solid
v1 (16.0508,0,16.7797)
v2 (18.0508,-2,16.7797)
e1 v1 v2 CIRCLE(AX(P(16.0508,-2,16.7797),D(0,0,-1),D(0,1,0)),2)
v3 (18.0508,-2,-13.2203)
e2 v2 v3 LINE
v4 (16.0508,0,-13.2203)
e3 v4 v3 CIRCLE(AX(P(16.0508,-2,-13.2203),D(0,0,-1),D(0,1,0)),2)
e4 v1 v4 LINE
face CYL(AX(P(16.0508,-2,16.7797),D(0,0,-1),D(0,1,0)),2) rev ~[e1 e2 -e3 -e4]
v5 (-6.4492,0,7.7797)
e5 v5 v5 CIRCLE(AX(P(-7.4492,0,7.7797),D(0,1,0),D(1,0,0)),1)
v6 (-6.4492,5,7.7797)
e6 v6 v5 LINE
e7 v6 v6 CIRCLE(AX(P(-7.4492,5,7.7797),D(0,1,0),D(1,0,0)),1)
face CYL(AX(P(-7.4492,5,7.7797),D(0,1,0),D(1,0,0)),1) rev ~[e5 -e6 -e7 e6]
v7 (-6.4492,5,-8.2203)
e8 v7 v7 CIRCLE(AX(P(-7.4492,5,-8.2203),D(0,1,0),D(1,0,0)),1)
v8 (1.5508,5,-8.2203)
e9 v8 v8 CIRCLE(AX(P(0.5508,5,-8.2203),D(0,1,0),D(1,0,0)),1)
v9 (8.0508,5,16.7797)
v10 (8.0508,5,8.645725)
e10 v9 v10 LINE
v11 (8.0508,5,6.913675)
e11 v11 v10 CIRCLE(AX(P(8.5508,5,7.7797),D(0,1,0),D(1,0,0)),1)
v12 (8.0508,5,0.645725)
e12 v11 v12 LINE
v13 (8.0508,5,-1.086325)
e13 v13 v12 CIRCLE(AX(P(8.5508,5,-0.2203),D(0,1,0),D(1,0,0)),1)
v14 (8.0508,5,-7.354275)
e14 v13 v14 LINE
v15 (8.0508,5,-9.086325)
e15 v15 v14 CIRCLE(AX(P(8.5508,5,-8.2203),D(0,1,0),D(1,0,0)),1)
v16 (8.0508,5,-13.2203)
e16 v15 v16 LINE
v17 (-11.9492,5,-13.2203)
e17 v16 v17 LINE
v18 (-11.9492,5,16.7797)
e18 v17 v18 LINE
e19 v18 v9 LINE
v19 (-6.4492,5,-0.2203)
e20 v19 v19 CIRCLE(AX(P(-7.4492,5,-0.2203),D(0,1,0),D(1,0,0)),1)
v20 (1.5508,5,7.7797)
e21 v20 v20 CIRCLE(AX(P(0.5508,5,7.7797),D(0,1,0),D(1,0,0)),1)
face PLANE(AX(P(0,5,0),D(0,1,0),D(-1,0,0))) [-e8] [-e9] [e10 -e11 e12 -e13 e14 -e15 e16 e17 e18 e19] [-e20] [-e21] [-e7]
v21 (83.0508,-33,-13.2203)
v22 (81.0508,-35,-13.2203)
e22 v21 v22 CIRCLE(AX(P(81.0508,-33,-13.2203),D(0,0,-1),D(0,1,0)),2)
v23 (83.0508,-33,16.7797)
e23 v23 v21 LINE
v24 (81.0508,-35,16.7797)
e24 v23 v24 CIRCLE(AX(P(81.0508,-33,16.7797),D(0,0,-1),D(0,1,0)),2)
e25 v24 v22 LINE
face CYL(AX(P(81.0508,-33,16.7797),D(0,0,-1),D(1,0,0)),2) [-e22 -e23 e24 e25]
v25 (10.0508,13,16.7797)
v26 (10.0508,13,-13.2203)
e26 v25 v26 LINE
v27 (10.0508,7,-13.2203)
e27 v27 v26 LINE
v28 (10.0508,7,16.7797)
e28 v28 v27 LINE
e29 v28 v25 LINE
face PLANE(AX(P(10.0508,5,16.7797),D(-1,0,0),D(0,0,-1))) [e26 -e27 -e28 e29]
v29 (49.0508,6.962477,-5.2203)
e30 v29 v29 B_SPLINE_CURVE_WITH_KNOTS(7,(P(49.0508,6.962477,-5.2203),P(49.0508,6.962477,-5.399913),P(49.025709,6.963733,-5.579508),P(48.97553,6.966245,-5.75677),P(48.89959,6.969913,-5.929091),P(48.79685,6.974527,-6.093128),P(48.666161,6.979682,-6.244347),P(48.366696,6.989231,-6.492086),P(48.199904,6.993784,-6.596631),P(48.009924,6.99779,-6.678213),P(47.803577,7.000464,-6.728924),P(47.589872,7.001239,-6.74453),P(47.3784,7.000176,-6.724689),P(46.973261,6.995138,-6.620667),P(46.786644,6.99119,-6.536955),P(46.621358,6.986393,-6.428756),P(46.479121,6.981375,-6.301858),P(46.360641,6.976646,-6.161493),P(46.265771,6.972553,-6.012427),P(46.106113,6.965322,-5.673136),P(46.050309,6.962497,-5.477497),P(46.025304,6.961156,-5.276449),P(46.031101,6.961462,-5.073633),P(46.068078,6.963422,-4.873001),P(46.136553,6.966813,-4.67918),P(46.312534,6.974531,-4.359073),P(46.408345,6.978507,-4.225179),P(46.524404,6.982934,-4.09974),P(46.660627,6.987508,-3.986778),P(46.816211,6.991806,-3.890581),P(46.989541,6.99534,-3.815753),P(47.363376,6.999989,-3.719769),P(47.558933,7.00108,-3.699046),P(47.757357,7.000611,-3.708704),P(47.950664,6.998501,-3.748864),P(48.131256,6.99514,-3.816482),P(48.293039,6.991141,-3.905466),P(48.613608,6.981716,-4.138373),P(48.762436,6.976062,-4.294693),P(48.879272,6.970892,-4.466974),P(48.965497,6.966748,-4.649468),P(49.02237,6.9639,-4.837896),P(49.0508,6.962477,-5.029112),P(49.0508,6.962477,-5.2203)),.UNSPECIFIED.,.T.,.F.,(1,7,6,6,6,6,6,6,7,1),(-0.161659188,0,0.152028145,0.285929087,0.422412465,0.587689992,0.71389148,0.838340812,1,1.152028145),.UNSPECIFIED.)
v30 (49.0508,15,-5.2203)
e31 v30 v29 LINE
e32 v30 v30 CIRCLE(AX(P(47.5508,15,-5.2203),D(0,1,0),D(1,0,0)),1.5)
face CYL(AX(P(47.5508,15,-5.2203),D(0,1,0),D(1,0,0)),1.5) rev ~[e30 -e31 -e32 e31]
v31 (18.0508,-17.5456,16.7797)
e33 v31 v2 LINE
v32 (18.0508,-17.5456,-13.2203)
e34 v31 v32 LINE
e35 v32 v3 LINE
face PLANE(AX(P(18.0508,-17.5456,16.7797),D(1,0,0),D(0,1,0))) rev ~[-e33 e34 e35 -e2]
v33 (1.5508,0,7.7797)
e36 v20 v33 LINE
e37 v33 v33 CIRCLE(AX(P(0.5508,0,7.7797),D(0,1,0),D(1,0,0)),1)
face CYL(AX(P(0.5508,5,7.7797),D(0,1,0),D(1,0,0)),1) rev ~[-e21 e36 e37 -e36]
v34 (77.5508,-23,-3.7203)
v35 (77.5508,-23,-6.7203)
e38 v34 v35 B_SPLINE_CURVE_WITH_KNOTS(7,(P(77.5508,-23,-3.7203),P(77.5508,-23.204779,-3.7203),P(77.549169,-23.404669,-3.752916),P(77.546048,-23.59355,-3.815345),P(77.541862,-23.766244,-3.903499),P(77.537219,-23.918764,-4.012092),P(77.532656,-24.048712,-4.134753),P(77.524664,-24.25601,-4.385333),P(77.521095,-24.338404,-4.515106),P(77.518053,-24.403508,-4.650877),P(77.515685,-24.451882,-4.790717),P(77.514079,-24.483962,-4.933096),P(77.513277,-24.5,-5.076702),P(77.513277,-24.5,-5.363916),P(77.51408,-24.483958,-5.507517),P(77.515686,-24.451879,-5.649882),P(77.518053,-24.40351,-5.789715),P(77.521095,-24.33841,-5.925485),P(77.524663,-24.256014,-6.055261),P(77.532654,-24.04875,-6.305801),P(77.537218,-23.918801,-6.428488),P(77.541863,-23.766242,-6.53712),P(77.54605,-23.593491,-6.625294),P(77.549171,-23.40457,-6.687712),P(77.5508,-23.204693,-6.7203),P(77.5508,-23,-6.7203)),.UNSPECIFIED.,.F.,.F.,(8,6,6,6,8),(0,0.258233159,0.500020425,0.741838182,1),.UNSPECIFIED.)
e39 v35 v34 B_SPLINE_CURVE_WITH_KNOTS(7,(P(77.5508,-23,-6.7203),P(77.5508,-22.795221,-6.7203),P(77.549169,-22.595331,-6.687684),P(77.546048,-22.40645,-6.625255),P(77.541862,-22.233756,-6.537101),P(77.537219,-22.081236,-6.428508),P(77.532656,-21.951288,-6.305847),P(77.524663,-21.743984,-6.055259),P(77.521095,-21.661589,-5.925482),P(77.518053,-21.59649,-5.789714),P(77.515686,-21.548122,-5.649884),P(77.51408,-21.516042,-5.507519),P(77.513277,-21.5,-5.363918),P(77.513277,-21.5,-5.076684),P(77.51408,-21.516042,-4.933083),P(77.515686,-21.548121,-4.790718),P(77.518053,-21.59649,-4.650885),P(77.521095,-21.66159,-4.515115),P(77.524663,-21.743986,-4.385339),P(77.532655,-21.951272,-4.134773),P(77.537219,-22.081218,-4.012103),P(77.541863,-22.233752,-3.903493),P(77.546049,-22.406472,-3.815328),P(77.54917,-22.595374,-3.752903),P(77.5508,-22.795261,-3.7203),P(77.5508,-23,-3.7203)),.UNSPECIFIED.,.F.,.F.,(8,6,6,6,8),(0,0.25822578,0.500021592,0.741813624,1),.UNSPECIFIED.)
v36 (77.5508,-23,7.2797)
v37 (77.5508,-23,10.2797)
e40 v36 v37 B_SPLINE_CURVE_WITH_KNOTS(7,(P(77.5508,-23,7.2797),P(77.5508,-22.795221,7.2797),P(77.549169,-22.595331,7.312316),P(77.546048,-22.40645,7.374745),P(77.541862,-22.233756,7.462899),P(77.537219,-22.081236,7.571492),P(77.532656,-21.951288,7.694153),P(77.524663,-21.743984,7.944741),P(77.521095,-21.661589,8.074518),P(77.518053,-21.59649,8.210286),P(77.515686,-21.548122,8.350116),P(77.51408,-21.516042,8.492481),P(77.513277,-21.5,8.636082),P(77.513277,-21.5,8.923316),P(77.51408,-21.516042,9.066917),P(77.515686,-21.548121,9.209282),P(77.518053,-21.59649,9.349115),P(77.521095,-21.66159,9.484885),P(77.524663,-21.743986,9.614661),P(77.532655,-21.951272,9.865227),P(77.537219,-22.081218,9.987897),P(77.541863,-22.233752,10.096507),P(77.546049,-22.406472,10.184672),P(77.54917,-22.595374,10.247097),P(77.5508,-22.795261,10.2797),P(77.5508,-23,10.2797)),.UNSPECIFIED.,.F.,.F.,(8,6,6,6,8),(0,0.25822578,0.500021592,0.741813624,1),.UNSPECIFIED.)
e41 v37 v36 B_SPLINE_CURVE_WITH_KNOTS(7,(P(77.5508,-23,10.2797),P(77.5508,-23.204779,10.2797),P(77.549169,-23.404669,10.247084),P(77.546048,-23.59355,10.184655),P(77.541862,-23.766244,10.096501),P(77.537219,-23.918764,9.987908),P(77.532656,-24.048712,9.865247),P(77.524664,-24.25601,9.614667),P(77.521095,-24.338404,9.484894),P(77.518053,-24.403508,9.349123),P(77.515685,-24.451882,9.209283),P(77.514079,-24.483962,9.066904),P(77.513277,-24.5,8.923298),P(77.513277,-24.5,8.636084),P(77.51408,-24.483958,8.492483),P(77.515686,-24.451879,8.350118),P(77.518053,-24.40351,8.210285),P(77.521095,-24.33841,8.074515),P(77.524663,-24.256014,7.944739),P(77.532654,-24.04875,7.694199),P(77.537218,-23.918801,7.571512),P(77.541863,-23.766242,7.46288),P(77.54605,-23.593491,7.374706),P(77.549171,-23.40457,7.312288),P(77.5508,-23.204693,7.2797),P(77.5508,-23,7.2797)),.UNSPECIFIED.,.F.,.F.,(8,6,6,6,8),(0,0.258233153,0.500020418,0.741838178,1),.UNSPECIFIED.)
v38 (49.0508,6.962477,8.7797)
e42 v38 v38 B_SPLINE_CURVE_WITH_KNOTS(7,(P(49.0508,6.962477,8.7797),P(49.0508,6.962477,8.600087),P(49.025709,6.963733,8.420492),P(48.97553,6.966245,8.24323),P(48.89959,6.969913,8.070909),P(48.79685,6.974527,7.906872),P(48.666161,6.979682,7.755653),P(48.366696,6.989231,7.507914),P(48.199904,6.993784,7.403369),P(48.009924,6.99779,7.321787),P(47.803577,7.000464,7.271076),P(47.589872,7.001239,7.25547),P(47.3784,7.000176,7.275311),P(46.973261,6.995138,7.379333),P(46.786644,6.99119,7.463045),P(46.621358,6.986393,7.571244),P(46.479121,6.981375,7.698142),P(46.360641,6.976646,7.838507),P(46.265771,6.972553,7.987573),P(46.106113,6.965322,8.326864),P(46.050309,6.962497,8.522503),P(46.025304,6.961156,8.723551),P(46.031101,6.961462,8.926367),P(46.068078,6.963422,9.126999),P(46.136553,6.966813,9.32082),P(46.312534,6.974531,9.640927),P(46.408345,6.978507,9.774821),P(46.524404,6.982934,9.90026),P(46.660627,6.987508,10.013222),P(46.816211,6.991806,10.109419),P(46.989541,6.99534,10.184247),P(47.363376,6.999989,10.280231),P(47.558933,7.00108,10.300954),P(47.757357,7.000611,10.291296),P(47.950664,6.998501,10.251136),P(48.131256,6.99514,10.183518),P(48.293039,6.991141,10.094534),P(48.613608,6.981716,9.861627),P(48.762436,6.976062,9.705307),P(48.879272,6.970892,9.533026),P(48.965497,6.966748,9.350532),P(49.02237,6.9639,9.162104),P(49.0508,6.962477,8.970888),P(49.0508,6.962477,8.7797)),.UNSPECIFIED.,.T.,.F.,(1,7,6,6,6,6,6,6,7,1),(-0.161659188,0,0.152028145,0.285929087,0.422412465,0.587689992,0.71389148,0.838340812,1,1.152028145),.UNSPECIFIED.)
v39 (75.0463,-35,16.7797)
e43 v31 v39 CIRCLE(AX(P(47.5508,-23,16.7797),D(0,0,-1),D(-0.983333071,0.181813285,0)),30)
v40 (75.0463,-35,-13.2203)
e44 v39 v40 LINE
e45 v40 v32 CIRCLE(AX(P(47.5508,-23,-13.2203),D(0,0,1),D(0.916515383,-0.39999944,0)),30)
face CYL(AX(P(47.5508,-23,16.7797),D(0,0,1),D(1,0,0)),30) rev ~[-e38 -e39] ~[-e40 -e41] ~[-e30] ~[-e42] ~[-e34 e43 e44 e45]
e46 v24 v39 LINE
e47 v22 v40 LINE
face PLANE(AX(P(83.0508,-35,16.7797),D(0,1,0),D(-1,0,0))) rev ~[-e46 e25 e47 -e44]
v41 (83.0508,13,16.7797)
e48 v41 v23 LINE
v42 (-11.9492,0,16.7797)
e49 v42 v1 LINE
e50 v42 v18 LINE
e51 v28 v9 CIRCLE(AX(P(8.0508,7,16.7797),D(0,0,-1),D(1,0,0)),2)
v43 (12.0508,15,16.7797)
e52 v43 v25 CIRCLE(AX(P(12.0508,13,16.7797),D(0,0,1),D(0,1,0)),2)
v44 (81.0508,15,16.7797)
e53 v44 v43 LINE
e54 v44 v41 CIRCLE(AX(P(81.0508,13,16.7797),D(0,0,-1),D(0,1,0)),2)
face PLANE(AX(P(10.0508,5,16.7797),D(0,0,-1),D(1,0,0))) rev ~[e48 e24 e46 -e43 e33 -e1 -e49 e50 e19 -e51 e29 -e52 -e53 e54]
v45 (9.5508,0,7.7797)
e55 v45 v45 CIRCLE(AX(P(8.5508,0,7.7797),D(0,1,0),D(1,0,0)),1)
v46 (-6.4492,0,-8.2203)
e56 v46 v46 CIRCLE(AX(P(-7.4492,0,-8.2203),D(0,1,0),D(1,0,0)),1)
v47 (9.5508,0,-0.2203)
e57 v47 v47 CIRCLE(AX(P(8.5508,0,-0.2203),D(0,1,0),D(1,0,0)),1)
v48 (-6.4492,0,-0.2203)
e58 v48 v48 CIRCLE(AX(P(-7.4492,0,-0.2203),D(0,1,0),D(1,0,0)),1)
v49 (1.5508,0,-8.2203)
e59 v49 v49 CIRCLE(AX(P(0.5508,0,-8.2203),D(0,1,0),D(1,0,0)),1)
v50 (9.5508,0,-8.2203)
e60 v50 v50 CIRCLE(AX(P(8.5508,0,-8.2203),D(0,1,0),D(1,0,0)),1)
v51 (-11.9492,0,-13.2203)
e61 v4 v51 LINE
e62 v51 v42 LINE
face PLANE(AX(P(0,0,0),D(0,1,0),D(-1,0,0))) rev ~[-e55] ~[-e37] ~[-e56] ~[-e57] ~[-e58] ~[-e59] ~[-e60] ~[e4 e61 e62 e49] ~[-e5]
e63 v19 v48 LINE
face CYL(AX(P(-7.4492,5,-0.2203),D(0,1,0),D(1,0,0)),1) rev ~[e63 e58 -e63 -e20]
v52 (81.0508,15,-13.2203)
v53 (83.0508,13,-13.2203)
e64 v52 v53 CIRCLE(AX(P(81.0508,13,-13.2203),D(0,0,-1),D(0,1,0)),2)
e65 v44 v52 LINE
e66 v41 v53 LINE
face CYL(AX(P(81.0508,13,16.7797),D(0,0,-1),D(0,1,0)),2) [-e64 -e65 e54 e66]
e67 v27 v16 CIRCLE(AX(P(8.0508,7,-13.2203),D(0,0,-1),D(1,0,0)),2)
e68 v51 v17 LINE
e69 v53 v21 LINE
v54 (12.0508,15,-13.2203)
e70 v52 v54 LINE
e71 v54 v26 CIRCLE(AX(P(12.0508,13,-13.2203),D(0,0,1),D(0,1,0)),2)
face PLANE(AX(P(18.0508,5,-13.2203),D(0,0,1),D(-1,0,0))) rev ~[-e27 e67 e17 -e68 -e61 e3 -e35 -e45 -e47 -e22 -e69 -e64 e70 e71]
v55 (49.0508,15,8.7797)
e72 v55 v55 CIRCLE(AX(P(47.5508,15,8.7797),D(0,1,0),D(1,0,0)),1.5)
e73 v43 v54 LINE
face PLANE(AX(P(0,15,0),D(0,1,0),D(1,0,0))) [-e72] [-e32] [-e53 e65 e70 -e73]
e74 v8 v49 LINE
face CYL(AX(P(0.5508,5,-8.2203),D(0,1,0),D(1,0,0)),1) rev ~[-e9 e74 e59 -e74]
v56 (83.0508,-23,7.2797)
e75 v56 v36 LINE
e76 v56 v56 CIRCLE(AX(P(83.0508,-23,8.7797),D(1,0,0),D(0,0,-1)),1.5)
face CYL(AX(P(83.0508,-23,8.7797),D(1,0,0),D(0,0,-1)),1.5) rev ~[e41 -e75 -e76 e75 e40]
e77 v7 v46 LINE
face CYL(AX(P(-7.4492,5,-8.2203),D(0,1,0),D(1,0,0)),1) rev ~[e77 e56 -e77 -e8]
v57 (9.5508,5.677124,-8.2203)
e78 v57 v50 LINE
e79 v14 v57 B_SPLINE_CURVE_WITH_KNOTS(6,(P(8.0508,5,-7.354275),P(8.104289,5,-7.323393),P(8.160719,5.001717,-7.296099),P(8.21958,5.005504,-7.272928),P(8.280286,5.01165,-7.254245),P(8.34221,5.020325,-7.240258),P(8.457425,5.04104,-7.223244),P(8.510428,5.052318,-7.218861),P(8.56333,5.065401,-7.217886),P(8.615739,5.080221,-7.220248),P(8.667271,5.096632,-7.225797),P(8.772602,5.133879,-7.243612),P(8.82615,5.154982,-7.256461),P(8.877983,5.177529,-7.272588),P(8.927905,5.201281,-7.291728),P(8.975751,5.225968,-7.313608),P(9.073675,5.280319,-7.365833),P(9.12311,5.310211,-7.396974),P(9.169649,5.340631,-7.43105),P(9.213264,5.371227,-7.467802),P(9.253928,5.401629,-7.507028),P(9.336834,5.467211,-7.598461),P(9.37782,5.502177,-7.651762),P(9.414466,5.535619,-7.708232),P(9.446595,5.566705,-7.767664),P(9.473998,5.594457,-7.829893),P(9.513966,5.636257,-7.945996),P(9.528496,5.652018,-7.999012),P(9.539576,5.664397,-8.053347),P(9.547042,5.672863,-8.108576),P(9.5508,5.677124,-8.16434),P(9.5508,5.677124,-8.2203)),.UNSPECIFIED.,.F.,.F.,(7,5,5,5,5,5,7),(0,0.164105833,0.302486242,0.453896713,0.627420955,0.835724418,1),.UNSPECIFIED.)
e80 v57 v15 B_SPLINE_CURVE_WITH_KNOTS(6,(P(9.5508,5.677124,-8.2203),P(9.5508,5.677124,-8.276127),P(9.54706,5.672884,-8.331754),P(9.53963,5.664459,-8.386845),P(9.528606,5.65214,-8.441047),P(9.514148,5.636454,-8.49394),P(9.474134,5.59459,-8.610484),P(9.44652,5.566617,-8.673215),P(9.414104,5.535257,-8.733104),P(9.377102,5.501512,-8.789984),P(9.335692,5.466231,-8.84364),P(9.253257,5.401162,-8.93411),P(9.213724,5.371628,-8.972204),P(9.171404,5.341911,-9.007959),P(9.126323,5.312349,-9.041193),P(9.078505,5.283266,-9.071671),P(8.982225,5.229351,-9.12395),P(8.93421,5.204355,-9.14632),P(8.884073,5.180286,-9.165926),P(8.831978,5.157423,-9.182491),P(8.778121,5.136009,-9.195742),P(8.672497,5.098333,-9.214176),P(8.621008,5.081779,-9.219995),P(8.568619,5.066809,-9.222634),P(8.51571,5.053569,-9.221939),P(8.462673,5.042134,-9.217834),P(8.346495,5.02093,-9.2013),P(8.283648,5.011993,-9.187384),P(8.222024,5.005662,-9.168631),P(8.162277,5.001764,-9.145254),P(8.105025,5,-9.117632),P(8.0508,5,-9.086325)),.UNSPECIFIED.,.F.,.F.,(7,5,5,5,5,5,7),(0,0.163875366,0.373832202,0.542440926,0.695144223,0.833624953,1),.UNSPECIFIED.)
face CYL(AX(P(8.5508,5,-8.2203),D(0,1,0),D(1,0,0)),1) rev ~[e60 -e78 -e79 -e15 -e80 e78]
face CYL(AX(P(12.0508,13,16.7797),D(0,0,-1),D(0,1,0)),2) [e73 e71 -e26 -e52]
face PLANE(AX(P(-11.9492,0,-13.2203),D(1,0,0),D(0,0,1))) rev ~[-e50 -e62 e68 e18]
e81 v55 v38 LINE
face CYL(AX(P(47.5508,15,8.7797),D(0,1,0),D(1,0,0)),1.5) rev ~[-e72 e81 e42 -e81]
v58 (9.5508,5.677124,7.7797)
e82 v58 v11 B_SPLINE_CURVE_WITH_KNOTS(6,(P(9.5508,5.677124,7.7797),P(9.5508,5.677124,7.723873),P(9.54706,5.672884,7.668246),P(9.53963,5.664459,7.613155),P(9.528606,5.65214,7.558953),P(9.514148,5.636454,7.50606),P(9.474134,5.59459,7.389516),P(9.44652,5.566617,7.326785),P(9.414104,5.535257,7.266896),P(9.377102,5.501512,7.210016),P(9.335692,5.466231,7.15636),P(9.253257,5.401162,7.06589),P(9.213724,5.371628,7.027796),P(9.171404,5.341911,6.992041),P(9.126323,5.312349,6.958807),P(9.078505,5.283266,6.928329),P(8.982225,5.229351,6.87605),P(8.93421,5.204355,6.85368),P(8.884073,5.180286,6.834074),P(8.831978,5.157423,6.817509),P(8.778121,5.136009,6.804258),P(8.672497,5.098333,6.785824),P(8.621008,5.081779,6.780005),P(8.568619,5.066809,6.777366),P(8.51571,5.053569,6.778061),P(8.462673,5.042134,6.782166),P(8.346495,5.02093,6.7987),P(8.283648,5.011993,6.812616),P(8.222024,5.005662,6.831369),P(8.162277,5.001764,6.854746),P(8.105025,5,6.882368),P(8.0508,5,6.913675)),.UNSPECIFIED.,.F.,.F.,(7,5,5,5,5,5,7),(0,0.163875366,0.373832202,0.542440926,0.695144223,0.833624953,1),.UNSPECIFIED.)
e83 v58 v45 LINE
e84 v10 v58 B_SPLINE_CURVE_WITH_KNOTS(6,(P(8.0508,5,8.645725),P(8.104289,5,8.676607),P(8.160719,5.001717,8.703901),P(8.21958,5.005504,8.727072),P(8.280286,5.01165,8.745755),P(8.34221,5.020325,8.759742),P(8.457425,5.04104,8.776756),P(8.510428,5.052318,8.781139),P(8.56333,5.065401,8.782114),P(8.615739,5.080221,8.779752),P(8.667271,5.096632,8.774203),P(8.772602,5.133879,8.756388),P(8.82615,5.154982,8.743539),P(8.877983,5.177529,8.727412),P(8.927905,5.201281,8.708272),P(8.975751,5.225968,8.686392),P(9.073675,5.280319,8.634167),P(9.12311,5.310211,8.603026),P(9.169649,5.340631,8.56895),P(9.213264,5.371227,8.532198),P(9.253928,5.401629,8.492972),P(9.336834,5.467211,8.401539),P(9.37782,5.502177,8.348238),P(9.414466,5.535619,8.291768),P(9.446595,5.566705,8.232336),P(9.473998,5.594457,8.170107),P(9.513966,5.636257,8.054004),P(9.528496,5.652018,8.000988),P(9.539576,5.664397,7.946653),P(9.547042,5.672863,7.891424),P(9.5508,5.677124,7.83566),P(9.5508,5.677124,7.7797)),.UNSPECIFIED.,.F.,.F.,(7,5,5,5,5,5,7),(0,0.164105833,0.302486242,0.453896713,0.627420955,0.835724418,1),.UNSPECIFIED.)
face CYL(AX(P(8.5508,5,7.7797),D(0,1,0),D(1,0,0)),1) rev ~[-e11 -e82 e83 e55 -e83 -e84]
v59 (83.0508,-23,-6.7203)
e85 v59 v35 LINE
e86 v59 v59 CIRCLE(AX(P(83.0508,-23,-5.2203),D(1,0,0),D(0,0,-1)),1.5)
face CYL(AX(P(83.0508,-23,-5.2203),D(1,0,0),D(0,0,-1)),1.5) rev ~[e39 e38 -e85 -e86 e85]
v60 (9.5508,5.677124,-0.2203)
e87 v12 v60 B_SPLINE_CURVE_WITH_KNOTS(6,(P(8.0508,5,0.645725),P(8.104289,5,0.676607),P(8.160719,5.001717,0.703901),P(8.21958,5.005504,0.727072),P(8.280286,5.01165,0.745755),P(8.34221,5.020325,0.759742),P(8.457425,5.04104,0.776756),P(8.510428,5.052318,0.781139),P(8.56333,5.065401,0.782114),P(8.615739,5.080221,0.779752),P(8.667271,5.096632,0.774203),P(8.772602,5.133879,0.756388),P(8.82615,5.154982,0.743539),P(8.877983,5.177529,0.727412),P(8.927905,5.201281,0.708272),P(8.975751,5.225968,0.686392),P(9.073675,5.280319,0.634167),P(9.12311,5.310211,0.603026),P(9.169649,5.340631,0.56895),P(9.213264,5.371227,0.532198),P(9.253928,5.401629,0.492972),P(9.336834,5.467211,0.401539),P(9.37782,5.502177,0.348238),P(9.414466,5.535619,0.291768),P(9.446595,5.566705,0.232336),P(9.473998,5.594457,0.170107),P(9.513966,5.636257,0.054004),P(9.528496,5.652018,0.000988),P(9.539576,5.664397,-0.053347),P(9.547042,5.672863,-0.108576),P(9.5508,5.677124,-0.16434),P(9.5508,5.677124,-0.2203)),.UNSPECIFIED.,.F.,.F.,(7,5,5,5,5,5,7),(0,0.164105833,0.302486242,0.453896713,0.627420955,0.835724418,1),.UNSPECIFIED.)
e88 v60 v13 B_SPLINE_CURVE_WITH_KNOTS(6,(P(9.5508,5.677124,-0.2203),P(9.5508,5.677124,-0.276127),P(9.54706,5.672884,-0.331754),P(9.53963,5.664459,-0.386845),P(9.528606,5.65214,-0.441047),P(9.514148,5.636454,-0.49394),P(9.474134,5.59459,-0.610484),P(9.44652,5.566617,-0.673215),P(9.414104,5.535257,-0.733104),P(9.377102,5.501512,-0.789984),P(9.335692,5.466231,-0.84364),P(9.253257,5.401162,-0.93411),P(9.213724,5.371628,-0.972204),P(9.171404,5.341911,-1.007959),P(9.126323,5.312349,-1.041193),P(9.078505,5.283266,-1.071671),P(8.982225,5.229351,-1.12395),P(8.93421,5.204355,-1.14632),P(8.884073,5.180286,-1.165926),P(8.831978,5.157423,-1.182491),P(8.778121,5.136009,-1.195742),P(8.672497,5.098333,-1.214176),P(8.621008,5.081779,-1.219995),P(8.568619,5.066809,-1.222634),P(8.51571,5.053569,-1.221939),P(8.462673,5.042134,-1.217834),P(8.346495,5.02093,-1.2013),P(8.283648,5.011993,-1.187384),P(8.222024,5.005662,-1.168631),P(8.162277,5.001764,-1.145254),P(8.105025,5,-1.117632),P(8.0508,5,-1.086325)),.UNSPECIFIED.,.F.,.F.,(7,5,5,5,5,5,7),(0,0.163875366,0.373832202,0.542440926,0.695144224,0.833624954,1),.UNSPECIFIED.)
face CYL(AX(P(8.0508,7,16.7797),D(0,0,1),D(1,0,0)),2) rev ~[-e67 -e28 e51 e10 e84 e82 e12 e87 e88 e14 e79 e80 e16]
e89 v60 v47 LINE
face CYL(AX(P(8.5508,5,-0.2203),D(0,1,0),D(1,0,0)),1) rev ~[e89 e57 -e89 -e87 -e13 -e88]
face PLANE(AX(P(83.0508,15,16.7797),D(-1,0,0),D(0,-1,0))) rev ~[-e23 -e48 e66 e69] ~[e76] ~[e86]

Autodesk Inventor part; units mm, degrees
ref_plane "YZ Plane" through (0, 0, 0) normal (1, 0, 0) x (0, 1, 0)
ref_plane "XZ Plane" through (0, 0, 0) normal (0, 1, 0) x (-1, 0, 0)
ref_plane "XY Plane" through (0, 0, 0) normal (0, 0, 1) x (1, 0, 0)
sketch "Esquisse1" plane through (0, 0, 0) normal (0, 1, 0) x (-1, 0, 0)
  line L0 (11.9492, 16.7797) -> (-18.0508, 16.7797)
  line L1 (-18.0508, 16.7797) -> (-18.0508, -13.2203)
  line L2 (-18.0508, -13.2203) -> (11.9492, -13.2203)
  line L3 (11.9492, -13.2203) -> (11.9492, 16.7797)
  point P0 (0, 0)
  dimension "d0" = 30
  dimension "d1" = 30
extrude "Extrusion1" add sketch "Esquisse1" along normal blind 5
sketch "Esquisse2" plane through (0, 5, 0) normal (0, 1, 0) x (1, 0, 0)
  line L0 (-11.9492, 17.2203) -> (-2.9492, 17.2203) projected
  line L1 (-11.9492, -16.7797) -> (-11.9492, 17.2203) projected
  line L2 (-11.9492, -16.7797) -> (-2.9492, -16.7797) projected
  line L3 (-2.9492, -15.7797) -> (-2.9492, -16.7797) projected
  line L4 (-2.9492, -15.7797) -> (5.0508, -15.7797) projected
  line L5 (5.0508, -15.7797) -> (5.0508, -16.7797) projected
  line L6 (5.0508, -16.7797) -> (13.0508, -16.7797) projected
  line L7 (13.0508, 17.2203) -> (13.0508, -16.7797) projected
  line L8 (5.0508, 17.2203) -> (13.0508, 17.2203) projected
  line L9 (5.0508, 16.2203) -> (5.0508, 17.2203) projected
  line L10 (-2.9492, 16.2203) -> (5.0508, 16.2203) projected
  line L11 (-2.9492, 16.2203) -> (-2.9492, 17.2203) projected
  circle A0 centre (-7.4492, 0.2203) radius 1 projected
  circle A1 centre (-7.4492, 8.2203) radius 1 projected
  circle A2 centre (-7.4492, -7.7797) radius 1 projected
  circle A3 centre (0.5508, -7.7797) radius 1 projected
  circle A4 centre (8.5508, 0.2203) radius 1 projected
  circle A5 centre (8.5508, 8.2203) radius 1 projected
  circle A6 centre (8.5508, -7.7797) radius 1 projected
  circle A7 centre (0.5508, 8.2203) radius 1 projected
  arc A8 (3.5508, -2.4254) -> (3.5508, 2.8661) centre (0.5508, 0.2203) ccw projected
  line L12 (3.5508, -2.4254) -> (3.5508, -4.7797) projected
  line L13 (3.5508, -4.7797) -> (-2.4492, -4.7797) projected
  line L14 (-2.4492, -4.7797) -> (-2.4492, -2.4254) projected
  arc A9 (-2.4492, 2.8661) -> (-2.4492, -2.4254) centre (0.5508, 0.2203) ccw projected
  line L15 (-2.4492, 2.8661) -> (-2.4492, 5.2203) projected
  line L16 (-2.4492, 5.2203) -> (3.5508, 5.2203) projected
  line L17 (3.5508, 5.2203) -> (3.5508, 2.8661) projected
  circle A10 centre (8.5508, 8.2203) radius 1
  circle A11 centre (8.5508, 0.2203) radius 1
  circle A12 centre (8.5508, -7.7797) radius 1
  circle A13 centre (0.5508, -7.7797) radius 1
  circle A14 centre (-7.4492, -7.7797) radius 1
  circle A15 centre (-7.4492, 0.2203) radius 1
  circle A16 centre (-7.4492, 8.2203) radius 1
  circle A17 centre (0.5508, 8.2203) radius 1
  point P0 (0, 0)
extrude "Extrusion2" cut sketch "Esquisse2" against normal through all contours A0 | A1 | A2 | A3 | A4 | A5 | A6 | A7
sketch "Esquisse3" plane through (0, 5, 0) normal (0, 1, 0) x (1, 0, 0)
  line L0 (18.0508, 13.2203) -> (-11.9492, 13.2203) projected
  line L1 (10.0508, -16.7797) -> (10.0508, 13.2203)
  line L2 (-11.9492, -16.7797) -> (18.0508, -16.7797) projected
  line L3 (18.0508, -16.7797) -> (18.0508, 13.2203) projected
  line L4 (10.0508, 13.2203) -> (18.0508, 13.2203)
  line L5 (18.0508, 13.2203) -> (18.0508, -16.7797)
  line L6 (18.0508, -16.7797) -> (10.0508, -16.7797)
  line L7 (10.0508, -16.7797) -> (10.0508, 13.2203)
  point P0 (0, 0)
  dimension "d7" = 8
extrude "Extrusion3" add sketch "Esquisse3" along normal blind 10
fillet "Congé4" radius 2 1 edges at (10.0508, 5, 1.7797)
sketch "Esquisse5" plane through (-11.9492, 0, 16.7797) normal (0, 0, 1) x (1, 0, 0)
  circle A0 centre (59.5, -23) radius 30 projected
  line L0 (30, 0) -> (30, 15) projected
  line L1 (30, 15) -> (95, 15)
  line L2 (95, 15) -> (95, -35)
  line L3 (30, -17.5456) -> (30, 15)
  arc A1 (86.9955, -35) -> (30, -17.5456) centre (59.5, -23) ccw
  line L4 (95, -35) -> (86.9955, -35)
  line L5 (32.0045, -35) -> (30, -35)
  point P0 (11.9492, 0)
  dimension "d17" = 65
  dimension "d18" = 50
extrude "Extrusion4" add sketch "Esquisse5" against normal blind 30 contours A0 L3 L0 L1 L2 L4
fillet "Congé5" radius 2 1 edges at (18.0508, 0, 1.7797)
fillet "Congé6" radius 2 1 edges at (10.0508, 15, 1.7797)
fillet "Congé7" radius 2 1 edges at (83.0508, 15, 1.7797)
fillet "Congé8" radius 2 1 edges at (83.0508, -35, 1.7797)
sketch "Esquisse6" plane through (83.0508, 13, 16.7797) normal (1, 0, 0) x (0, 0, -1)
  circle A0 centre (8, -36) radius 1.5
  circle A1 centre (22, -36) radius 1.5
  line L0 (0, -46) -> (0, 0) projected
  line L1 (30, 0) -> (30, -46) projected
  line L2 (171, -6) -> (-4, -6)
  line L3 (171, -66) -> (-4, -66)
  point P0 (16.7797, -13)
  dimension "d25" = 3
  dimension "d26" = 3
  dimension "d27" = 8
  dimension "d28" = 8
  dimension "d29" = 30
  dimension "d30" = 30
extrude "Extrusion5" cut sketch "Esquisse6" against normal through all
sketch "Esquisse7" plane through (0, 15, 0) normal (0, 1, 0) x (1, 0, 0)
  circle A0 centre (47.5508, 5.2203) radius 1.5
  circle A1 centre (47.5508, -8.7797) radius 1.5
  line L0 (12.0508, -16.7797) -> (81.0508, -16.7797) projected
  line L1 (12.0508, 13.2203) -> (81.0508, 13.2203) projected
  line L2 (17.5508, 154.2203) -> (17.5508, -20.7797)
  point P0 (0, 0)
  dimension "d33" = 3
  dimension "d34" = 3
  dimension "d35" = 8
  dimension "d36" = 8
  dimension "d37" = 30
  dimension "d38" = 30
extrude "Extrusion6" cut sketch "Esquisse7" against normal through all
properties part number "support-trappe"
